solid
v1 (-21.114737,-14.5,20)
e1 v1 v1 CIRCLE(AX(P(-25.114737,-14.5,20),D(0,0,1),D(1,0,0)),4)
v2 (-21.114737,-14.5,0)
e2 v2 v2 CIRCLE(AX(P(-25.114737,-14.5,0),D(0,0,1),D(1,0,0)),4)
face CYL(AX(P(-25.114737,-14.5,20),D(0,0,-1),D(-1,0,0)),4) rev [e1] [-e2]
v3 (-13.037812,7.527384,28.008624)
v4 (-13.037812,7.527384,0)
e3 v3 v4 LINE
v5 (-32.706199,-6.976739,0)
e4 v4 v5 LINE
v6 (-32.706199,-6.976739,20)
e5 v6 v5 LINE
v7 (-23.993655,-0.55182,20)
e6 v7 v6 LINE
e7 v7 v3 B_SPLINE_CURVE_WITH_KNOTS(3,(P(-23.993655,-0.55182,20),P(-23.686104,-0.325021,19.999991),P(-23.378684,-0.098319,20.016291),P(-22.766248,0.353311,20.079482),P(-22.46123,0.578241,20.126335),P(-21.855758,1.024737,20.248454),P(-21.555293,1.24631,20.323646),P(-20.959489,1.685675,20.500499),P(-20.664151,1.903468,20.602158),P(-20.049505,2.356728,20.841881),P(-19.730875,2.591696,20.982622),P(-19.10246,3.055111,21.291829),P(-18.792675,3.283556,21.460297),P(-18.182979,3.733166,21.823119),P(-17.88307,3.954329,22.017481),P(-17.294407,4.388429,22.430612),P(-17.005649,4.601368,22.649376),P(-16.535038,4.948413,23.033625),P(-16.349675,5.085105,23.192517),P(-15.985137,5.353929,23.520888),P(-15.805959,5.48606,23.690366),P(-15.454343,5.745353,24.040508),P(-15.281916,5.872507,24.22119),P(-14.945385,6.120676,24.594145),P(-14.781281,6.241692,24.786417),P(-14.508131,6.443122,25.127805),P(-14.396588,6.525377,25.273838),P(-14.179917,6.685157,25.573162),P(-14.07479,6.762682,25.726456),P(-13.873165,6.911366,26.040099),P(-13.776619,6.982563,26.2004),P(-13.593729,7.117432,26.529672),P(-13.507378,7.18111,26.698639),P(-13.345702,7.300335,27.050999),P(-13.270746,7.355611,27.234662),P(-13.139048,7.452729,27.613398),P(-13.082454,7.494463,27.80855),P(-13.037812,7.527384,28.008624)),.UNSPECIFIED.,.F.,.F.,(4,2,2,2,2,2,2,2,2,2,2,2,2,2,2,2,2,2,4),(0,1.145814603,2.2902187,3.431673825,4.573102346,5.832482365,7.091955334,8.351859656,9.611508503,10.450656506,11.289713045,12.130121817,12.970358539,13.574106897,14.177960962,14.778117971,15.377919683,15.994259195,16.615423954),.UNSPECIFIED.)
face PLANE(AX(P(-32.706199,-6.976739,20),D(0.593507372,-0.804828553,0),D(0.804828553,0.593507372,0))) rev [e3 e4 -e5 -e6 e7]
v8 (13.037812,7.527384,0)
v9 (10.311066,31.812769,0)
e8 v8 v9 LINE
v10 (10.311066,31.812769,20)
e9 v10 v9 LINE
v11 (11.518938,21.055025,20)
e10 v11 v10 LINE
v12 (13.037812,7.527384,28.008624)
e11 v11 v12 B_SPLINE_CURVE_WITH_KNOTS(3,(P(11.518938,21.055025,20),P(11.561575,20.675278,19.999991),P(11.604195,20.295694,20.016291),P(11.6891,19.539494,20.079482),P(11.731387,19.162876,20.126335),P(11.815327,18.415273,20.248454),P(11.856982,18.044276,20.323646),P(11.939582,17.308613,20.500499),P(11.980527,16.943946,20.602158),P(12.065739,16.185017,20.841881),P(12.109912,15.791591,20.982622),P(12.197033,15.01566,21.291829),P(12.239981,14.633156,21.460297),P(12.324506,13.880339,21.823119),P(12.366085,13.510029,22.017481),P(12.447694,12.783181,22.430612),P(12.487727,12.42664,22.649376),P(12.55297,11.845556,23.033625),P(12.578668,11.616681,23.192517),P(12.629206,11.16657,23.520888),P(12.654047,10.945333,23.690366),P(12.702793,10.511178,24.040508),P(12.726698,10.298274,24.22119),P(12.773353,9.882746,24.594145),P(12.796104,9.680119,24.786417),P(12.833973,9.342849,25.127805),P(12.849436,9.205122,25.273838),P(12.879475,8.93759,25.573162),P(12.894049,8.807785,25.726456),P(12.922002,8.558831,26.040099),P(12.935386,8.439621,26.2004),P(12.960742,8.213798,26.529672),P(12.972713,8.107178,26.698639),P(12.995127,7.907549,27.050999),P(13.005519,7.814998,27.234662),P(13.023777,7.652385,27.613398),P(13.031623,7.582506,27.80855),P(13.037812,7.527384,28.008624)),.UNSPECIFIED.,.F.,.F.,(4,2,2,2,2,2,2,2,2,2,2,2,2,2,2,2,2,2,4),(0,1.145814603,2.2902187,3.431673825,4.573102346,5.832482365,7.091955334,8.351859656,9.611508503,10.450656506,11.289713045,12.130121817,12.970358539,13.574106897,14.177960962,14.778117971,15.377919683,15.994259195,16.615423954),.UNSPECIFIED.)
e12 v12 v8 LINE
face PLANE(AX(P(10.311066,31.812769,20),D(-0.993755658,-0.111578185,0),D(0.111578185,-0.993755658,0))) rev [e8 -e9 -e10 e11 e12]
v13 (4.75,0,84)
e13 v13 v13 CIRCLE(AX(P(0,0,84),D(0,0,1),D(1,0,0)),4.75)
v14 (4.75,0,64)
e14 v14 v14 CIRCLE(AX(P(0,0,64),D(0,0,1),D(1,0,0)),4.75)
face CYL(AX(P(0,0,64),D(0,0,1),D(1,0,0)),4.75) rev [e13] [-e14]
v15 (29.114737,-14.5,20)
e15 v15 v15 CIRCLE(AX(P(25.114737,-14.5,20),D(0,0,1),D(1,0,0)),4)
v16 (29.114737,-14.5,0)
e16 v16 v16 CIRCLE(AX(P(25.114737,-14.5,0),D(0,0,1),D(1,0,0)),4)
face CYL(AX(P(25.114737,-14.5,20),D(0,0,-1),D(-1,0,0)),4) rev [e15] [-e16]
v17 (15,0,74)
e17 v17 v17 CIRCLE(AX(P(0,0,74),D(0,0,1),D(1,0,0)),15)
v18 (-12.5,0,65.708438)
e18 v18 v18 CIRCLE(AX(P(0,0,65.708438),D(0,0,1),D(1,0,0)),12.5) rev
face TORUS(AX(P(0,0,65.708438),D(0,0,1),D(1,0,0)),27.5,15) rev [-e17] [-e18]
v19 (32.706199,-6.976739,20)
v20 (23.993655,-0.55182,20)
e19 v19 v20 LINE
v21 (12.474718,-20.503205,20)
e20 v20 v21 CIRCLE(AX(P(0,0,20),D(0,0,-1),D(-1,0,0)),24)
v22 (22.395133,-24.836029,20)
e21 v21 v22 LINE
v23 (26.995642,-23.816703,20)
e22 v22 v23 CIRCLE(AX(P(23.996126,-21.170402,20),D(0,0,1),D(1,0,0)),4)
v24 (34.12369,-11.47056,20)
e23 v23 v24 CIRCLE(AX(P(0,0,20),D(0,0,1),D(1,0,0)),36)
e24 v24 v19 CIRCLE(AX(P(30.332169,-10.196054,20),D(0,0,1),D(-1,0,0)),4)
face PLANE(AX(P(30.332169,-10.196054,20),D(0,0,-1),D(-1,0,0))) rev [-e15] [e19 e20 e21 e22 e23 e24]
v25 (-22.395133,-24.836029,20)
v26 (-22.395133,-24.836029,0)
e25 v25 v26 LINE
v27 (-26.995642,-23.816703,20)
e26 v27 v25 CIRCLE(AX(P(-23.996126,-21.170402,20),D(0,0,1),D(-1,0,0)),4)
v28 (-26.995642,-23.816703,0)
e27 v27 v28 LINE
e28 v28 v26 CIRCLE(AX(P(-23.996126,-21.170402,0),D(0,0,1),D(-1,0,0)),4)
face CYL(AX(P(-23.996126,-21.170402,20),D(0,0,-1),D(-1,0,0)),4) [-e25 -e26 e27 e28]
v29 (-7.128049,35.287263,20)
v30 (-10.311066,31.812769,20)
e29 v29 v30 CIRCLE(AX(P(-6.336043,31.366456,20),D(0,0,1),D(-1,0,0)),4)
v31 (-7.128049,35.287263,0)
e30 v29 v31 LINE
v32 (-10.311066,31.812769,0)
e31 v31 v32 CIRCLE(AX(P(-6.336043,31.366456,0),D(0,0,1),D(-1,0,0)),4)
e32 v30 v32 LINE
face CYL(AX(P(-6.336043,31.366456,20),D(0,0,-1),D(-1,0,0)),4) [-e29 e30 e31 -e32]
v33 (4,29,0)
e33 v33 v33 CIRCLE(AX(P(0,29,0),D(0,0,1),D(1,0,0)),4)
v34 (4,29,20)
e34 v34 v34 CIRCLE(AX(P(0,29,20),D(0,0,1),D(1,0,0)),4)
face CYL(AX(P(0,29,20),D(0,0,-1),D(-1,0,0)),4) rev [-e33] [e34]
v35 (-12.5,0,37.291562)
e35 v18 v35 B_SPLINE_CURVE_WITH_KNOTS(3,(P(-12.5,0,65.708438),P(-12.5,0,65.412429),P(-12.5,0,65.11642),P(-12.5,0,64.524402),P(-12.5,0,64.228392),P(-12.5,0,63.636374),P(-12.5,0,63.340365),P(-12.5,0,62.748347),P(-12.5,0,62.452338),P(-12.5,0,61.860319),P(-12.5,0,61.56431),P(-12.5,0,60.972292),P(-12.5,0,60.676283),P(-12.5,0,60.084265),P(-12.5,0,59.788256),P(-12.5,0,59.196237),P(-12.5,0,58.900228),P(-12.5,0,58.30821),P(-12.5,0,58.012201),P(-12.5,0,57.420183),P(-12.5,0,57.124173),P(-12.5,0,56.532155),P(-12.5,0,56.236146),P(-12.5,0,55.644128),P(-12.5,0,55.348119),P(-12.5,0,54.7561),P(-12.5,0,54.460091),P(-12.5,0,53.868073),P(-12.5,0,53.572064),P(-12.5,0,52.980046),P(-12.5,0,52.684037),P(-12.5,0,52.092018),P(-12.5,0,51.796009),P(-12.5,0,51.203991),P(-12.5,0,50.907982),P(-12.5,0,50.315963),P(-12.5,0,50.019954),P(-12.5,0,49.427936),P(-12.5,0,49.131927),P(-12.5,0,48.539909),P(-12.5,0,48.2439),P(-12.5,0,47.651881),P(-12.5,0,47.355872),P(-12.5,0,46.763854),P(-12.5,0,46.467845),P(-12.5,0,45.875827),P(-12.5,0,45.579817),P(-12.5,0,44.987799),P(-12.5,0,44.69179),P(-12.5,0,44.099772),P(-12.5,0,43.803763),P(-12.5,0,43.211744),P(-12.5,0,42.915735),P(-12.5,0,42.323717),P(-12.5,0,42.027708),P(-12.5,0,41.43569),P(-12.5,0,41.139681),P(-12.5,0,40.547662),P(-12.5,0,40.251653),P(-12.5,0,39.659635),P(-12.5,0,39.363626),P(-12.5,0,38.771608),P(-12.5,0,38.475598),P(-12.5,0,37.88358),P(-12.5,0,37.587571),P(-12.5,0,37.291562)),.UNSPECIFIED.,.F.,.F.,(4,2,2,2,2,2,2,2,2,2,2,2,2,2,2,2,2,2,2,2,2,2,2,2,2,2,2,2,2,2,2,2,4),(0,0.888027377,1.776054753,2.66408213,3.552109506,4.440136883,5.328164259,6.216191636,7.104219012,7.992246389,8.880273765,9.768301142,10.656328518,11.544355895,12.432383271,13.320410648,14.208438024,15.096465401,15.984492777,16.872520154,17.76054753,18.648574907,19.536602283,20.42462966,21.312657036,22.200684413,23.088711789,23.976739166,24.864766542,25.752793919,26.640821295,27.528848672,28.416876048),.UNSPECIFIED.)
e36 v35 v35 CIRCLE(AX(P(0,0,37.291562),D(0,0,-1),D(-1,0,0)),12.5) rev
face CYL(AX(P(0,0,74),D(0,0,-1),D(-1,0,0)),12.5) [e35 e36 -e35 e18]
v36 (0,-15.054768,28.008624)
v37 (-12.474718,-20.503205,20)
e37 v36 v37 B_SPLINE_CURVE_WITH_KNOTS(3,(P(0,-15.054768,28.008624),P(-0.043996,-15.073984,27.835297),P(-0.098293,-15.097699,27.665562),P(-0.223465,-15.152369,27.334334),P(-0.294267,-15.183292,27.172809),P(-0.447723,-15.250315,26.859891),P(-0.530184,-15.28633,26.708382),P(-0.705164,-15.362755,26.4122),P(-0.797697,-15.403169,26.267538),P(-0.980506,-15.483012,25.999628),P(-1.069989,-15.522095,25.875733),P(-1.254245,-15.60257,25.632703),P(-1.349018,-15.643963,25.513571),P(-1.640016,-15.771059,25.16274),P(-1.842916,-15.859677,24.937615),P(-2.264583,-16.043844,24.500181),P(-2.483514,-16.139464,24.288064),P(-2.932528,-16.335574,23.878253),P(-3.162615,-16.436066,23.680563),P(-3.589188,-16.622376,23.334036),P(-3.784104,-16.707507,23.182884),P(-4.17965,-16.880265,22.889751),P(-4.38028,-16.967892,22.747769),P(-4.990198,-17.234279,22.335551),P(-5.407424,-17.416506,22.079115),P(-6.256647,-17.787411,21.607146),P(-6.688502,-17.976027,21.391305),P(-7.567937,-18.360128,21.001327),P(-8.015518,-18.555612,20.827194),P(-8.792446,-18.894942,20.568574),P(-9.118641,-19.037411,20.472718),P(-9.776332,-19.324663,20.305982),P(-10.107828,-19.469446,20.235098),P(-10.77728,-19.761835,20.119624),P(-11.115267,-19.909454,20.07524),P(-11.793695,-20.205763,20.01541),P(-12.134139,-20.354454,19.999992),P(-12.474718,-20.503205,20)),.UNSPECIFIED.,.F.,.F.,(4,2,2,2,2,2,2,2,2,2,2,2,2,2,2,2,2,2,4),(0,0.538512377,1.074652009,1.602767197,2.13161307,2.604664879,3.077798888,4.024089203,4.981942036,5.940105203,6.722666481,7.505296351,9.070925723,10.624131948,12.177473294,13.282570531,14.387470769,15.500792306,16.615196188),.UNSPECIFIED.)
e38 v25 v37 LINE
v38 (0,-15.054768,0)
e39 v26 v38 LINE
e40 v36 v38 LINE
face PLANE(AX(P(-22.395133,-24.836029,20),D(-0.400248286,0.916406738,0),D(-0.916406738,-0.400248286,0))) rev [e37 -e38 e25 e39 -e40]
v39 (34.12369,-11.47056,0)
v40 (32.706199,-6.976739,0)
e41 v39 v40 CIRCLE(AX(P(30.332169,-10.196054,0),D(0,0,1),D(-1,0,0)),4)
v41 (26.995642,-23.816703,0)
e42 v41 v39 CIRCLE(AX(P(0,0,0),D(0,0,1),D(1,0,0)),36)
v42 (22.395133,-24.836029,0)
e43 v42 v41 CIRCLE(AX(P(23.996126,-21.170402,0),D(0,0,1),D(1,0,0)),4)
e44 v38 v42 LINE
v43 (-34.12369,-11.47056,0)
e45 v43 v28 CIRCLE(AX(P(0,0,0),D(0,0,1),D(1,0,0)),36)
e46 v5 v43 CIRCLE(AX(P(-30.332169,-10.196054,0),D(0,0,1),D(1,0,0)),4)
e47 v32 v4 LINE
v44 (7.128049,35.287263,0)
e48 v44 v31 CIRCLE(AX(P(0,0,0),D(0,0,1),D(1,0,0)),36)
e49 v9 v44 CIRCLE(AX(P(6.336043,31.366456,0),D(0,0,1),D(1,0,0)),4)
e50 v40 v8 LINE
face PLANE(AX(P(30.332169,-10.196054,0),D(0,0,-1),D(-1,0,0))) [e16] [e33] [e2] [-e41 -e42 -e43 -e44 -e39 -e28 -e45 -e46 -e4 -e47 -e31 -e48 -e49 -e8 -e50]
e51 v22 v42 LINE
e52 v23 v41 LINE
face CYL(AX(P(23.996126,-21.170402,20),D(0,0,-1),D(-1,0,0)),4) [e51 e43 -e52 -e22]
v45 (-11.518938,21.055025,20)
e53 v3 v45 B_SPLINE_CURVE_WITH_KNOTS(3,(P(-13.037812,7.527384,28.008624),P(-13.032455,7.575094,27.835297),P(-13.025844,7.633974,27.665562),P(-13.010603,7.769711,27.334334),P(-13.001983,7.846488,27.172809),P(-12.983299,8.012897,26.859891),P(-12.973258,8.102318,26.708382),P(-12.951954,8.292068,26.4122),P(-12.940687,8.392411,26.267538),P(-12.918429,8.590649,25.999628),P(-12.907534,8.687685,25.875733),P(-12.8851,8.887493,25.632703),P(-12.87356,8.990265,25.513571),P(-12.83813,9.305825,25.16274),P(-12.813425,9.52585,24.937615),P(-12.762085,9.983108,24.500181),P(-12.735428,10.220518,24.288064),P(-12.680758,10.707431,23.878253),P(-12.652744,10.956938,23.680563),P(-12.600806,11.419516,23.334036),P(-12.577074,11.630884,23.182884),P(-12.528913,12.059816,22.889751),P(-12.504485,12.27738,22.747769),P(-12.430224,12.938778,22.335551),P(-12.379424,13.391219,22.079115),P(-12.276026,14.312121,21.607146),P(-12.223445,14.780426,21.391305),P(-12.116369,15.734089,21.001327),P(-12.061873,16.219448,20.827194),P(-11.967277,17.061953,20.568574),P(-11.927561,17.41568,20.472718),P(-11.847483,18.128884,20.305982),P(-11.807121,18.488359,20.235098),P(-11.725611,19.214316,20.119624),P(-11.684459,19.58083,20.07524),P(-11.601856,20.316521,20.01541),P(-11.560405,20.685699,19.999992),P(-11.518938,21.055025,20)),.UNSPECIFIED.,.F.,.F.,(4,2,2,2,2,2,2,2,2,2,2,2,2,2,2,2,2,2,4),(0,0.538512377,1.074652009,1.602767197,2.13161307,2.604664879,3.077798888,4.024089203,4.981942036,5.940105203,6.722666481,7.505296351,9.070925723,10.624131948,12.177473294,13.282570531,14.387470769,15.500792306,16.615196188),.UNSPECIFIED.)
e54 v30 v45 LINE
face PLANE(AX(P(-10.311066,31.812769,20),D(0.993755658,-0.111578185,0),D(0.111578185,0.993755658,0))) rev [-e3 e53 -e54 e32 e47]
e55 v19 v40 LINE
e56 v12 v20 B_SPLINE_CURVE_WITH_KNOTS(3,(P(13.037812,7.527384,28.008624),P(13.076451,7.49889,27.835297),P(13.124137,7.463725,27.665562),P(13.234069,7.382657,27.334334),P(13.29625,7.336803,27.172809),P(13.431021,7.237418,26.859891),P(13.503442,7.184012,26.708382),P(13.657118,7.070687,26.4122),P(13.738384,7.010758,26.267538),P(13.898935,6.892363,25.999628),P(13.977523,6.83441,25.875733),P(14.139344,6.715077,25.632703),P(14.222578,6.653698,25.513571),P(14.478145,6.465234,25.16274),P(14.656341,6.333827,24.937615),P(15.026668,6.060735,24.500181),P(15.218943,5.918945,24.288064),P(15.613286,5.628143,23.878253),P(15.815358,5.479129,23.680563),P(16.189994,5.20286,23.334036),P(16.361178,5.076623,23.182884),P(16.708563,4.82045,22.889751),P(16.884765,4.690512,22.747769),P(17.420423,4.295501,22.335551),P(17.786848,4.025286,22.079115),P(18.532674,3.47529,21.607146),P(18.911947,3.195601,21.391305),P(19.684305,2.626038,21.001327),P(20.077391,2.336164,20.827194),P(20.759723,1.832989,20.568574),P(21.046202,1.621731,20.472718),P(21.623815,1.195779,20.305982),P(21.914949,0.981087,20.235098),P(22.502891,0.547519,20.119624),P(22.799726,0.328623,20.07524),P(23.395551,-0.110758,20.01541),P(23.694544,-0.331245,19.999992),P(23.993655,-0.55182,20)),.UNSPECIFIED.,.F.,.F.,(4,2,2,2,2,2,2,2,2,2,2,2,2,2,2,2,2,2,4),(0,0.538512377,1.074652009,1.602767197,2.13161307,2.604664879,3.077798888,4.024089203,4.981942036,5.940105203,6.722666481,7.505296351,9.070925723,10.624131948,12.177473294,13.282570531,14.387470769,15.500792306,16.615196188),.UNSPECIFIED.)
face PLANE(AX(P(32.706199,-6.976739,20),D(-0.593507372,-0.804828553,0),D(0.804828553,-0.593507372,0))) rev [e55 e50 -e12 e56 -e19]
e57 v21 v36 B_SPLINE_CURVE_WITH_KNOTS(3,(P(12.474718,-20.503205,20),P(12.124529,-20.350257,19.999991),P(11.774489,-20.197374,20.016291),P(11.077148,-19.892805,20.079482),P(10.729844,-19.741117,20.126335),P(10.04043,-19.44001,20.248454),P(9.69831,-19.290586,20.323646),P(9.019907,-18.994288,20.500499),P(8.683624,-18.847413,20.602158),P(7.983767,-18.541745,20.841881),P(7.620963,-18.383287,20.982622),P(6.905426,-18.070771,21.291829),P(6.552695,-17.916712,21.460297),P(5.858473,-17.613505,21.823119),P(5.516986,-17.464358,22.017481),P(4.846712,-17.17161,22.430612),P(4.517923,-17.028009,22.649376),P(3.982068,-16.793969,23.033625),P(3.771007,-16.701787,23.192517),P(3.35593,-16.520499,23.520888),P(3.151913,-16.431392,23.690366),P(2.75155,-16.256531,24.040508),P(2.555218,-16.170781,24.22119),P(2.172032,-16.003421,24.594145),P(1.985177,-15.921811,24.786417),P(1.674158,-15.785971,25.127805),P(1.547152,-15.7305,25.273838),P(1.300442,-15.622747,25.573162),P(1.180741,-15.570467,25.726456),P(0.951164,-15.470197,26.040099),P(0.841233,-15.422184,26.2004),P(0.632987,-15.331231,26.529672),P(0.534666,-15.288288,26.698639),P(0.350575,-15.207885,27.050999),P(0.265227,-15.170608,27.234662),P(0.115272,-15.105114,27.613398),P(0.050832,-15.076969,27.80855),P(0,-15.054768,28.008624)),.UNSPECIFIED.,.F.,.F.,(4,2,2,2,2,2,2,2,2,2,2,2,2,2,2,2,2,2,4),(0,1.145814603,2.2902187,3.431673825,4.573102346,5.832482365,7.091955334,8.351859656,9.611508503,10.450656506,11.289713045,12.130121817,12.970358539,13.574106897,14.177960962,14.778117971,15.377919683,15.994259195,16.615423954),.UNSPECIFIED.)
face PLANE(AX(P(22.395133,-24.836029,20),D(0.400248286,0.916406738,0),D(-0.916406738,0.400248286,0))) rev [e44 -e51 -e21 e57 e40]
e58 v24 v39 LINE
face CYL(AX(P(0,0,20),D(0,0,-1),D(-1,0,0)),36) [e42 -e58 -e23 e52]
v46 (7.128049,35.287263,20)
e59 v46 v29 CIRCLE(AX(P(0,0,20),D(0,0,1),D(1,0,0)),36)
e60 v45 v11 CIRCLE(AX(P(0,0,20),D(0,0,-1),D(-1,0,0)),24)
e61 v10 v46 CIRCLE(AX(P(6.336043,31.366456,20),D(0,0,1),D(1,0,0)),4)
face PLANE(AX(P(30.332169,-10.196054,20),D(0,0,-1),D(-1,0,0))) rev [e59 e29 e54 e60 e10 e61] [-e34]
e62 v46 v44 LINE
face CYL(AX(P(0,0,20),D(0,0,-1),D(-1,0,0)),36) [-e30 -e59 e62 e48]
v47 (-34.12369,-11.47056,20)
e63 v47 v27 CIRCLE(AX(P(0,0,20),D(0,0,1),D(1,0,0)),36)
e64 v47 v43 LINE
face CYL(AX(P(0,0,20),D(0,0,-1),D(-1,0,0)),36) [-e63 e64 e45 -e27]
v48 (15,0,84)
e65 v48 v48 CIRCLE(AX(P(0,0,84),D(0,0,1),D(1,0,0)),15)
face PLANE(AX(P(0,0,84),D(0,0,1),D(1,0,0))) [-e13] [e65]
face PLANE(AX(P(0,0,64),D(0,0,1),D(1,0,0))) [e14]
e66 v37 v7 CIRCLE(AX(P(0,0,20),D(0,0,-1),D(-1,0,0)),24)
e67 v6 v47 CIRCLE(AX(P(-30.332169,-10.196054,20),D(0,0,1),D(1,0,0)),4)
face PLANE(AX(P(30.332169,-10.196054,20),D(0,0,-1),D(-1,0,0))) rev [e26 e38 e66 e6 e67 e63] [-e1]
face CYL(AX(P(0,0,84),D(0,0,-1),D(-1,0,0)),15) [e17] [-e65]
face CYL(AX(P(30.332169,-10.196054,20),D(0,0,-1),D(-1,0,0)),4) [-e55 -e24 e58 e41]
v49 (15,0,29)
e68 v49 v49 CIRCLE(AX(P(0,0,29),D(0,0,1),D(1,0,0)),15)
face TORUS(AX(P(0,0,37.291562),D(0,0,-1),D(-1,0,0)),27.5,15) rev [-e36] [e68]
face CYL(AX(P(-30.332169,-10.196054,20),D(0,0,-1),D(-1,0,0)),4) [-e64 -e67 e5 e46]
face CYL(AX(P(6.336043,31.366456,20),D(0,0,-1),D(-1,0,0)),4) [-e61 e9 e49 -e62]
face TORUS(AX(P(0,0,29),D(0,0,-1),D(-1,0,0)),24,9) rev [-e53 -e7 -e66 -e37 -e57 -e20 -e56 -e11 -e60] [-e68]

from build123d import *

# Parameters (mm, degrees)
SKETCH1_R           = 4
BOSS_EXTRUDE1_DEPTH = 20
SKETCH2_R           = 15
BOSS_EXTRUDE2_DEPTH = 9
SKETCH3_R           = 12.5
BOSS_EXTRUDE3_DEPTH = 45
SKETCH5_R           = 15
BOSS_EXTRUDE4_DEPTH = 10
FILLET3_R           = 9
FILLET4_R           = 15
SKETCH6_R           = 4.75
CUT_EXTRUDE1_DEPTH  = 20


with BuildPart() as part:
    # Sketch1 → Boss-Extrude1 (new body)
    with BuildSketch(Plane.XY):
        with BuildLine():
            Line((10.311065776, 31.812768666), (13.037811649, 7.527384065))
            Line((13.037811649, 7.527384065), (32.706198717, -6.976739431))
            ThreePointArc((32.706198717, -6.976739431), (34.146892061, -8.992770752), (34.123690383, -11.470560347))
            ThreePointArc((34.123690383, -11.470560347), (31.176914536, -18), (26.995641847, -23.816702569))
            ThreePointArc((26.995641847, -23.816702569), (24.861413952, -25.075690609), (22.395132941, -24.836029235))
            Line((22.395132941, -24.836029235), (0, -15.05476813))
            Line((0, -15.05476813), (-22.395132941, -24.836029235))
            ThreePointArc((-22.395132941, -24.836029235), (-24.861413952, -25.075690609), (-26.995641847, -23.816702569))
            ThreePointArc((-26.995641847, -23.816702569), (-31.176914536, -18), (-34.123690383, -11.470560347))
            ThreePointArc((-34.123690383, -11.470560347), (-34.146892061, -8.992770752), (-32.706198717, -6.976739431))
            Line((-32.706198717, -6.976739431), (-13.037811649, 7.527384065))
            Line((-13.037811649, 7.527384065), (-10.311065776, 31.812768666))
            ThreePointArc((-10.311065776, 31.812768666), (-9.285478109, 34.068461361), (-7.128048535, 35.287262916))
            ThreePointArc((-7.128048535, 35.287262916), (0, 36), (7.128048535, 35.287262916))
            ThreePointArc((7.128048535, 35.287262916), (9.285478109, 34.068461361), (10.311065776, 31.812768666))
        make_face()
        with Locations((0, 29)):
            Circle(SKETCH1_R, mode=Mode.SUBTRACT)
        with Locations((-25.11473671, -14.5)):
            Circle(SKETCH1_R, mode=Mode.SUBTRACT)
        with Locations((25.11473671, -14.5)):
            Circle(SKETCH1_R, mode=Mode.SUBTRACT)
    extrude(amount=BOSS_EXTRUDE1_DEPTH)

    # Sketch2 → Boss-Extrude2 (add)
    with BuildSketch(Plane.XY.offset(20)):
        with Locations(Location((0, 0, 0), (0, 0, 180))):
            Circle(SKETCH2_R)
    extrude(amount=BOSS_EXTRUDE2_DEPTH)

    # Sketch3 → Boss-Extrude3 (add)
    with BuildSketch(Plane.XY.offset(29)):
        with Locations(Location((0, 0, 0), (0, 0, 180))):
            Circle(SKETCH3_R)
    extrude(amount=BOSS_EXTRUDE3_DEPTH)

    # Sketch5 → Boss-Extrude4 (add)
    with BuildSketch(Plane.XY.offset(74)):
        with Locations(Location((0, 0, 0), (0, 0, 180))):
            Circle(SKETCH5_R)
    extrude(amount=BOSS_EXTRUDE4_DEPTH)

    # Fillet3
    # the kernel refuses this fillet: 9 mm, written as the material it adds along each edge
    with BuildSketch(Plane(origin=(0, 0, 20), x_dir=(-1, 0, 0), z_dir=(0, 1, 0))) as fillet3_piece_1_section:
        with BuildLine():
            CenterArc((15 + FILLET3_R, FILLET3_R), FILLET3_R, 180, 90)
            Line((15 + FILLET3_R, 0), (15, 0))
            Line((15, 0), (15, FILLET3_R))
        make_face()
    fillet3_piece_1 = revolve(axis=Axis((0, 0, 20), (0, 0, 1)), mode=Mode.PRIVATE)
    fillet3_piece_1 = split(fillet3_piece_1, bisect_by=Plane(origin=(-2.104235359, 18.693633693, 22.074494406), z_dir=(-0.5935073720778344, -0.8048285527298736, 0)), keep=Keep.TOP, mode=Mode.PRIVATE)
    fillet3_piece_1 = split(fillet3_piece_1, bisect_by=Plane(origin=(-19.127560762, 3.036600307, 22.074494406), z_dir=(0.5935073720778299, -0.8048285527298771, 0)), keep=Keep.TOP, mode=Mode.PRIVATE)
    fillet3_piece_1 = split(fillet3_piece_1, bisect_by=Plane(origin=(-8.489861011, -18.762785739, 22.074494406), z_dir=(-0.4002482863162174, 0.9164067379176843, 0)), keep=Keep.TOP, mode=Mode.PRIVATE)
    add(fillet3_piece_1)
    with BuildSketch(Plane(origin=(0, 0, 20), x_dir=(-1, 0, 0), z_dir=(0, 1, 0))) as fillet3_piece_2_section:
        with BuildLine():
            CenterArc((15 + FILLET3_R, FILLET3_R), FILLET3_R, 180, 90)
            Line((15 + FILLET3_R, 0), (15, 0))
            Line((15, 0), (15, FILLET3_R))
        make_face()
    fillet3_piece_2 = revolve(axis=Axis((0, 0, 20), (0, 0, 1)), mode=Mode.PRIVATE)
    fillet3_piece_2 = split(fillet3_piece_2, bisect_by=Plane(origin=(12.004118745, 16.733826801, 22.074494266), z_dir=(-0.9937556583940517, -0.11157818518780918, 0)), keep=Keep.TOP, mode=Mode.PRIVATE)
    fillet3_piece_2 = split(fillet3_piece_2, bisect_by=Plane(origin=(-12.193553488, 15.046652486, 22.074494266), z_dir=(0.9937556583940516, -0.1115781851878097, 0)), keep=Keep.TOP, mode=Mode.PRIVATE)
    fillet3_piece_2 = split(fillet3_piece_2, bisect_by=Plane(origin=(-17.241277087, -7.524496557, 22.074494266), z_dir=(0.4002482863162113, 0.916406737917687, 0)), keep=Keep.TOP, mode=Mode.PRIVATE)
    add(fillet3_piece_2)
    with BuildSketch(Plane(origin=(0, 0, 20), x_dir=(-1, 0, 0), z_dir=(0, 1, 0))) as fillet3_piece_3_section:
        with BuildLine():
            CenterArc((15 + FILLET3_R, FILLET3_R), FILLET3_R, 180, 90)
            Line((15 + FILLET3_R, 0), (15, 0))
            Line((15, 0), (15, FILLET3_R))
        make_face()
    fillet3_piece_3 = revolve(axis=Axis((0, 0, 20), (0, 0, 1)), mode=Mode.PRIVATE)
    fillet3_piece_3 = split(fillet3_piece_3, bisect_by=Plane(origin=(12.39704086, -20.469279127, 20.602322319), z_dir=(0.4002482863162113, 0.916406737917687, 0)), keep=Keep.TOP, mode=Mode.PRIVATE)
    fillet3_piece_3 = split(fillet3_piece_3, bisect_by=Plane(origin=(16.223816266, -7.968881057, 20.602322319), z_dir=(0.4002482863162174, -0.9164067379176843, 0)), keep=Keep.TOP, mode=Mode.PRIVATE)
    add(fillet3_piece_3)

    # Fillet4
    # the kernel refuses this fillet: 15 mm, written as the material it adds along each edge
    with BuildSketch(Plane(origin=(0, 0, 29), x_dir=(-1, 0, 0), z_dir=(0, 1, 0))) as fillet4_piece_1:
        with BuildLine():
            CenterArc((27.5, 8.291561976), FILLET4_R, 180, 33.557309762)
            Line((12.5, 8.291561976), (12.5, 0))
            Line((12.5, 0), (15, 0))
        make_face()
    revolve(axis=Axis((0, 0, 29), (0, 0, 1)))
    with BuildSketch(Plane(origin=(0, 0, 74), x_dir=(-1, 0, 0), z_dir=(0, 1, 0))) as fillet4_piece_2:
        with BuildLine():
            CenterArc((27.5, -8.291561976), FILLET4_R, 146.442690238, 33.557309762)
            Line((15, 0), (12.5, 0))
            Line((12.5, 0), (12.5, -8.291561976))
        make_face()
    revolve(axis=Axis((0, 0, 74), (0, 0, 1)))

    # Sketch6 → Cut-Extrude1 (cut)
    with BuildSketch(Plane.XY.offset(84)):
        Circle(SKETCH6_R)
    extrude(amount=-CUT_EXTRUDE1_DEPTH, mode=Mode.SUBTRACT)


solid = part.part
